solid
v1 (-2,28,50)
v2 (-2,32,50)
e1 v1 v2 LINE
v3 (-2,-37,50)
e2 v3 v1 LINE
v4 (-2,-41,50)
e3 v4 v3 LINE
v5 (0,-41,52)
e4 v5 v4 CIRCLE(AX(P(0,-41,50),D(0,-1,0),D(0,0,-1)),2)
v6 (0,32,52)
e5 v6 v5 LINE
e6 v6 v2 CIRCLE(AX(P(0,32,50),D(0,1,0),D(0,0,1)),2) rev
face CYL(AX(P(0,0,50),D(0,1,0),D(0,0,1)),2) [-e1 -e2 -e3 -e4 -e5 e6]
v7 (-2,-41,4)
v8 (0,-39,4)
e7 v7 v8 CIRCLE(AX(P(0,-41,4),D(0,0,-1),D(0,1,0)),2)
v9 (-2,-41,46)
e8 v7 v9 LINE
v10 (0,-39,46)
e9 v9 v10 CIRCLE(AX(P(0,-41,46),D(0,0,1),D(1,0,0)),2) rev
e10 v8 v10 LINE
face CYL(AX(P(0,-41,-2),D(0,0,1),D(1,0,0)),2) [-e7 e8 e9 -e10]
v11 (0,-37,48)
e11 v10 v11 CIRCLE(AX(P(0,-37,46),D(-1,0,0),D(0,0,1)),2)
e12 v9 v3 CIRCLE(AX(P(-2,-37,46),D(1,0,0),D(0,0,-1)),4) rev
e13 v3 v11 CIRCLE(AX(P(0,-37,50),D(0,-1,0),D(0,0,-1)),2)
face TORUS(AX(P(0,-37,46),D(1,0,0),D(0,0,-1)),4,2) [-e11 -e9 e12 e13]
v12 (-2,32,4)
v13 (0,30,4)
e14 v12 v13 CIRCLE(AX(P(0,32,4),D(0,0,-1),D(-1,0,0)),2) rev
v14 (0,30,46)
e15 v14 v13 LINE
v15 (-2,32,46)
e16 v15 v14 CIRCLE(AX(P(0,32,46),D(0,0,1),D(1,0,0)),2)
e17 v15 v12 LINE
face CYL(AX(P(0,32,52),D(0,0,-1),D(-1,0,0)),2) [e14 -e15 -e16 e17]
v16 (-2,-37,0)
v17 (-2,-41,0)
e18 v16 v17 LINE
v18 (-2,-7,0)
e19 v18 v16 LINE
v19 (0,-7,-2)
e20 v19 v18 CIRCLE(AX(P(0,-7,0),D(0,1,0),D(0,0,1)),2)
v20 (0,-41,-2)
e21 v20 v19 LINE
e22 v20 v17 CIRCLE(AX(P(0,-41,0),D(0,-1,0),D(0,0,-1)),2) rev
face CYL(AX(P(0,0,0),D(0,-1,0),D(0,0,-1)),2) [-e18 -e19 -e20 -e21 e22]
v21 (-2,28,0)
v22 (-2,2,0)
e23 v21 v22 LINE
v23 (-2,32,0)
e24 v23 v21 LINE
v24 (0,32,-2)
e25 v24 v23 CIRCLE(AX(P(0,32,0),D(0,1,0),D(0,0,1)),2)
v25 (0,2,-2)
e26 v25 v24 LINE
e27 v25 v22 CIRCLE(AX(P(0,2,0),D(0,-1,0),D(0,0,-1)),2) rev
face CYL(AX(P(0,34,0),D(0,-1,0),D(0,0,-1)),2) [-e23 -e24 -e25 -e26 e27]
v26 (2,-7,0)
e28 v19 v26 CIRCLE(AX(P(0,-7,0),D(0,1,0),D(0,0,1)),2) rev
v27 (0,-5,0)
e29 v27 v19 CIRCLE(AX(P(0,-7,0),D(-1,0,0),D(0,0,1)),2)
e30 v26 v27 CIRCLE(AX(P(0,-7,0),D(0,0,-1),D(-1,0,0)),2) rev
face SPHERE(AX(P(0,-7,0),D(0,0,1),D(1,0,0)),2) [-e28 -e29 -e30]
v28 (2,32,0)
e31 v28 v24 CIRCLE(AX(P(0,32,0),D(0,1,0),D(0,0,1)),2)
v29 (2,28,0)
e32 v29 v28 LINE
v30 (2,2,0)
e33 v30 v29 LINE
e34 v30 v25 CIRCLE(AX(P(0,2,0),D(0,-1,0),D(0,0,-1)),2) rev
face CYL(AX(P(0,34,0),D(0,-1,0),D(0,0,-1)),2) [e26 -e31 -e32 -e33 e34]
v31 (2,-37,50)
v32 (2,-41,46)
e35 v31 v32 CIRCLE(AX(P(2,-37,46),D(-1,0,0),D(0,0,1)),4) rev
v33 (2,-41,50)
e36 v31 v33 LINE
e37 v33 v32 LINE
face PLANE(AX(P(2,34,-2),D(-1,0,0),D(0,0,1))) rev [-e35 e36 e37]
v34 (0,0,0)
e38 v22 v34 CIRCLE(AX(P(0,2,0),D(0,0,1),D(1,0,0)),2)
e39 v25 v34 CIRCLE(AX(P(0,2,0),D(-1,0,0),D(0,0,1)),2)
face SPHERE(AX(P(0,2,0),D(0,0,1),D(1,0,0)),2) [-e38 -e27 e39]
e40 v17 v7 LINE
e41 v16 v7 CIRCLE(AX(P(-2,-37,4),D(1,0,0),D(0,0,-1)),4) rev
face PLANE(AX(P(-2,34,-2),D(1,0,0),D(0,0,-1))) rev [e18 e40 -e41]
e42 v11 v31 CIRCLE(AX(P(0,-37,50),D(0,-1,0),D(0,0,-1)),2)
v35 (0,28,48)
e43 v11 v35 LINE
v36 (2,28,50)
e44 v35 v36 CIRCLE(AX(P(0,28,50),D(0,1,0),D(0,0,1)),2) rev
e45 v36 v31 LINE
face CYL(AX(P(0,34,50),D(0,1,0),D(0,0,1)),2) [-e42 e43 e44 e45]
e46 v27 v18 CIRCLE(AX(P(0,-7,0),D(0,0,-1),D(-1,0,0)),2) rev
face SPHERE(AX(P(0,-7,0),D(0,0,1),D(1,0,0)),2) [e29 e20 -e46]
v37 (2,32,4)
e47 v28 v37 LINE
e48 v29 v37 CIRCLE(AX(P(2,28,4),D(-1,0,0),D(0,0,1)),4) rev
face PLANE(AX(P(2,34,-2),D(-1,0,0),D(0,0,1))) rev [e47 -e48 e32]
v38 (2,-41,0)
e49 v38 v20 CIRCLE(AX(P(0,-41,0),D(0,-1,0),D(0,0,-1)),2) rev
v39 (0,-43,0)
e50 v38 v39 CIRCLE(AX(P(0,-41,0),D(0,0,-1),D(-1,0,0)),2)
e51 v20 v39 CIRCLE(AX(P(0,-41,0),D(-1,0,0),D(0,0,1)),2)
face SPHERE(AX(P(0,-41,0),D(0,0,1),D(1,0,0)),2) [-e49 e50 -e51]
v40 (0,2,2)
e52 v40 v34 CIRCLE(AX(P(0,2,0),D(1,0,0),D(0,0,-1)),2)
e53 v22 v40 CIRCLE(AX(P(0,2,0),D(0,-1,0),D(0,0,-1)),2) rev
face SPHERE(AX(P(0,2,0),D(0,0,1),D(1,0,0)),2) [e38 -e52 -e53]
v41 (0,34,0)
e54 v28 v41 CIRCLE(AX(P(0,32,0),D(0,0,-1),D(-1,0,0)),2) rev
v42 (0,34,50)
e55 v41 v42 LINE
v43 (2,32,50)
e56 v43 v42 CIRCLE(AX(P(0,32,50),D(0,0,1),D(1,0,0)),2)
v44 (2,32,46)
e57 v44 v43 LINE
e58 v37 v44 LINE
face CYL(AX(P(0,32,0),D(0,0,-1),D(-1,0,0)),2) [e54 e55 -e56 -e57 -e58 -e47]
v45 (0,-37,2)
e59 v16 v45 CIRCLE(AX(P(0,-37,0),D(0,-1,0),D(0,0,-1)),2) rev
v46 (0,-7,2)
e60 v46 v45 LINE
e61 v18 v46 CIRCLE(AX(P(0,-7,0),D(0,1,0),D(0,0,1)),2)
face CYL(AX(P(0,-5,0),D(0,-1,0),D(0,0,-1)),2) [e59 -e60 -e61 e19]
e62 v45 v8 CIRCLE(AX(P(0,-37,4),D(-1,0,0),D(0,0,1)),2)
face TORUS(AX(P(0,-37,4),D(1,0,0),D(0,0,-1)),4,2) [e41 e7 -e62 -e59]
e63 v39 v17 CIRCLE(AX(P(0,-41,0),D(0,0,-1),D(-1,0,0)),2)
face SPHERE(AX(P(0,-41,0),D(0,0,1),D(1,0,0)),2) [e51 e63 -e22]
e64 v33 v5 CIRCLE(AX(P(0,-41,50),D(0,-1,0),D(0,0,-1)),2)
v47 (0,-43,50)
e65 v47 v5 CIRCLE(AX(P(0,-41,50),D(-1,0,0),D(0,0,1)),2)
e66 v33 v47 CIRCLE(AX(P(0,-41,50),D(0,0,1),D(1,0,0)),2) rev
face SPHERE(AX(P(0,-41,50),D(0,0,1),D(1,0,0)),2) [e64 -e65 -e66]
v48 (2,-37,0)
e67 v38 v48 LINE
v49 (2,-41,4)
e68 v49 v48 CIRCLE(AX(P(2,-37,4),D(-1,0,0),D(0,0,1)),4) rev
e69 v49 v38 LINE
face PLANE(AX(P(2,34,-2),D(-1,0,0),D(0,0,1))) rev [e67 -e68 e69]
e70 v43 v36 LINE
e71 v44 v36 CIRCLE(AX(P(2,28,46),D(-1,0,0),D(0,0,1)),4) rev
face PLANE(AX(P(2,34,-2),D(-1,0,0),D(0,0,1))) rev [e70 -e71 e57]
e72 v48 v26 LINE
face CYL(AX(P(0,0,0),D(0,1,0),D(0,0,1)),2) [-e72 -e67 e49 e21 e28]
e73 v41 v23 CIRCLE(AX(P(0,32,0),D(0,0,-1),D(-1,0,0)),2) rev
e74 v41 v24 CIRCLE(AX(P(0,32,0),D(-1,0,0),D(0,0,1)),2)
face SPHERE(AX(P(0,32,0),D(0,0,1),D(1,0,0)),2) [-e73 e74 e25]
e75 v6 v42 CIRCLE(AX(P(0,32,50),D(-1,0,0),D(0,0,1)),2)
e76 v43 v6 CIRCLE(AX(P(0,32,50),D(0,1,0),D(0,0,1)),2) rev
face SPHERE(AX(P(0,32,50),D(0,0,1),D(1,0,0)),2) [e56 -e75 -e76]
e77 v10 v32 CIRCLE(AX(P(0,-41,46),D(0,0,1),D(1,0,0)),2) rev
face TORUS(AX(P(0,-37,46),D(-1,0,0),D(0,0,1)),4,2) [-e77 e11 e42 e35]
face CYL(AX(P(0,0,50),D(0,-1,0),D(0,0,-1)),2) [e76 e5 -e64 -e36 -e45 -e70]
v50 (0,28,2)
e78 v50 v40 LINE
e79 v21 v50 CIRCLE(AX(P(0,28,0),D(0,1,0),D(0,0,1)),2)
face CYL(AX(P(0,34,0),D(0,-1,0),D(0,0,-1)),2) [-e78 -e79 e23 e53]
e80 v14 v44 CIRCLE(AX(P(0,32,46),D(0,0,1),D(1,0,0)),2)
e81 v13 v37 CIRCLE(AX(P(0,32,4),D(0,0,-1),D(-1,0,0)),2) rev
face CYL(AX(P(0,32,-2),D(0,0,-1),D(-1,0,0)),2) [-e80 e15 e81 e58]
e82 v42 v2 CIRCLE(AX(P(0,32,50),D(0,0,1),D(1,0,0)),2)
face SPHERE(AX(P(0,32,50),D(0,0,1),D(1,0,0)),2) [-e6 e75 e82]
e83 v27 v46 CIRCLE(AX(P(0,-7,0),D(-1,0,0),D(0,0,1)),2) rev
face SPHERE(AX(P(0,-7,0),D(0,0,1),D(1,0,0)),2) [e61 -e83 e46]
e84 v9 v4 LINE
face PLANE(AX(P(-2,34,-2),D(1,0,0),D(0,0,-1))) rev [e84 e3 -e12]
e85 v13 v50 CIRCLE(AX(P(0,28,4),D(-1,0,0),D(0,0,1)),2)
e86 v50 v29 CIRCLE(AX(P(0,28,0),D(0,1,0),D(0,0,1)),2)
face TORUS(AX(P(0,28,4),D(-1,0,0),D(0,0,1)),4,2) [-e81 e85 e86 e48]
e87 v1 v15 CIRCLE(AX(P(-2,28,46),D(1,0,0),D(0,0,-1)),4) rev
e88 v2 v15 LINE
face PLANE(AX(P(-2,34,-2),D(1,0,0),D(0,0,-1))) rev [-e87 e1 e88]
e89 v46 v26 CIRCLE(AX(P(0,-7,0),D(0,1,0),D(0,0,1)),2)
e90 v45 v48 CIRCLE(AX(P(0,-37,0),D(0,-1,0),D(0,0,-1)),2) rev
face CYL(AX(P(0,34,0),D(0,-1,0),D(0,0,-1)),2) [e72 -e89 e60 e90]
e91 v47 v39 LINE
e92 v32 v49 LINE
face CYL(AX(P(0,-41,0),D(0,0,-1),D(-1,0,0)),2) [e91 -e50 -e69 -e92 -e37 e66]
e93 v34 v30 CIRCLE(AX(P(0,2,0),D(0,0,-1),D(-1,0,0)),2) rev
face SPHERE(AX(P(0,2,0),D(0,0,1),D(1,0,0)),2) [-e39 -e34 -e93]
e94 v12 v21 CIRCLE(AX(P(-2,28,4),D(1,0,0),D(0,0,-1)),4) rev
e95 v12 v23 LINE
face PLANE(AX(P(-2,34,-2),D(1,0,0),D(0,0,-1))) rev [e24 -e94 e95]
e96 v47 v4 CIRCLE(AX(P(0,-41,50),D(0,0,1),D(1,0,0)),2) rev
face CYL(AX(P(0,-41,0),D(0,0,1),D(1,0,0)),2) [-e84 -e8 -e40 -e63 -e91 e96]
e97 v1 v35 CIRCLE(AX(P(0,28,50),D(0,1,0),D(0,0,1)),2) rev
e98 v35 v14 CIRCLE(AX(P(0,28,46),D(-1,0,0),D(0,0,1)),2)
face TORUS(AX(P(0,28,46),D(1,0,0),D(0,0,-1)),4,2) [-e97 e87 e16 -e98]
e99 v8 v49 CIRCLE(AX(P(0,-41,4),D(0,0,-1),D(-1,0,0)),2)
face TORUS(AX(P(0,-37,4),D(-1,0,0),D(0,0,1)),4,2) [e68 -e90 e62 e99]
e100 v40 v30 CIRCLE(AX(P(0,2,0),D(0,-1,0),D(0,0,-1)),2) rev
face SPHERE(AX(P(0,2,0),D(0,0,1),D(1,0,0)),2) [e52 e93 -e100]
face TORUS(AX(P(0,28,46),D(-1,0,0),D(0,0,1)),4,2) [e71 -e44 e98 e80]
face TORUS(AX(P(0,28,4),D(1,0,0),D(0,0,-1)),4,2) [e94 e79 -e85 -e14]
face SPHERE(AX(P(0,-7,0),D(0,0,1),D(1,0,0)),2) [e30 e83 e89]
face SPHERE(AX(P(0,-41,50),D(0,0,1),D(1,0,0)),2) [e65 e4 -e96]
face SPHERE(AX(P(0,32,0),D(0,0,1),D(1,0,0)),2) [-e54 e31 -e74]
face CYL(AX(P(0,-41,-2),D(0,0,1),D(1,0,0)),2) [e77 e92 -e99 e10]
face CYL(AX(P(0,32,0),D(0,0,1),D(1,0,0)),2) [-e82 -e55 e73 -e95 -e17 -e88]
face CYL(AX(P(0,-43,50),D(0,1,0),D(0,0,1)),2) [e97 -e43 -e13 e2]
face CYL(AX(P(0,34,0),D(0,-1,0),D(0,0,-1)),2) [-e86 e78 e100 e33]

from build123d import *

# Parameters (mm, degrees)
SZKIC1_W                    = 4
SZKIC1_H                    = 4
DODANIE_WYCI_GNI_CIE1_DEPTH = 34
SZKIC2_W                    = 4
SZKIC2_H                    = 4
DODANIE_WYCI_GNI_CIE2_DEPTH = 50
SZKIC3_W                    = 4
SZKIC3_H                    = 4
DODANIE_WYCI_GNI_CIE3_DEPTH = 73
SZKIC4_W                    = 4
SZKIC4_H                    = 4
DODANIE_WYCI_GNI_CIE4_DEPTH = 50
SZKIC5_W                    = 4
SZKIC5_H                    = 4
DODANIE_WYCI_GNI_CIE5_DEPTH = 34
ZAOKR_GLENIE1_R             = 2


with BuildPart() as part:
    # Szkic1 → Dodanie-wyciągnięcie1 (new body)
    with BuildSketch(Plane(origin=(0, 0, 0), x_dir=(1, 0, 0), z_dir=(0, 1, 0))):
        Rectangle(SZKIC1_W, SZKIC1_H)
    extrude(amount=DODANIE_WYCI_GNI_CIE1_DEPTH)

    # Szkic2 → Dodanie-wyciągnięcie2 (add)
    with BuildSketch(Plane.XY.offset(2)):
        with Locations((0, 32)):
            Rectangle(SZKIC2_W, SZKIC2_H)
    extrude(amount=DODANIE_WYCI_GNI_CIE2_DEPTH)

    # Szkic3 → Dodanie-wyciągnięcie3 (add)
    with BuildSketch(Plane.XZ.offset(-30)):
        with Locations((0, 50)):
            Rectangle(SZKIC3_W, SZKIC3_H)
    extrude(amount=DODANIE_WYCI_GNI_CIE3_DEPTH)

    # Szkic4 → Dodanie-wyciągnięcie4 (add)
    with BuildSketch(Plane(origin=(0, 0, 48), x_dir=(-1, 0, 0), z_dir=(0, 0, -1))):
        with Locations((0, -41)):
            Rectangle(SZKIC4_W, SZKIC4_H)
    extrude(amount=DODANIE_WYCI_GNI_CIE4_DEPTH)

    # Szkic5 → Dodanie-wyciągnięcie5 (add)
    with BuildSketch(Plane(origin=(0, -39, 0), x_dir=(1, 0, 0), z_dir=(0, 1, 0))):
        Rectangle(SZKIC5_W, SZKIC5_H)
    extrude(amount=DODANIE_WYCI_GNI_CIE5_DEPTH)

    # Zaokrąglenie1
    zaokr_glenie1_edges = [part.edges().sort_by_distance(p)[0] for p in [
        (2, 34, 25),
        (0, 34, -2),
        (2, 15, 2),
        (-2, 15, 2),
        (0, 30, 2),
        (-2, -4.5, 52),
        (2, -4.5, 52),
        (0, 34, 52),
        (2, 30, 25),
        (-2, 30, 25),
        (0, 30, 48),
        (-2, -43, 25),
        (2, -43, 25),
        (0, -43, 52),
        (2, -4.5, 48),
        (-2, -4.5, 48),
        (-2, 34, 25),
        (0, -39, 48),
        (-2, -24, -2),
        (2, -24, -2),
        (0, -43, -2),
        (0, 0, -2),
        (2, 0, 0),
        (2, -39, 25),
        (-2, -39, 25),
        (0, 0, 2),
        (2, -22, 2),
        (0, -39, 2),
        (-2, -22, 2),
        (2, -5, 0),
        (0, -5, -2),
        (-2, -5, 0),
        (0, -5, 2),
        (-2, 0, 0),
        (-2, 17, -2),
        (2, 17, -2),
    ]]
    fillet(zaokr_glenie1_edges, radius=ZAOKR_GLENIE1_R - 0.0001)  # a hair under: the kernel refuses the full size


solid = part.part
